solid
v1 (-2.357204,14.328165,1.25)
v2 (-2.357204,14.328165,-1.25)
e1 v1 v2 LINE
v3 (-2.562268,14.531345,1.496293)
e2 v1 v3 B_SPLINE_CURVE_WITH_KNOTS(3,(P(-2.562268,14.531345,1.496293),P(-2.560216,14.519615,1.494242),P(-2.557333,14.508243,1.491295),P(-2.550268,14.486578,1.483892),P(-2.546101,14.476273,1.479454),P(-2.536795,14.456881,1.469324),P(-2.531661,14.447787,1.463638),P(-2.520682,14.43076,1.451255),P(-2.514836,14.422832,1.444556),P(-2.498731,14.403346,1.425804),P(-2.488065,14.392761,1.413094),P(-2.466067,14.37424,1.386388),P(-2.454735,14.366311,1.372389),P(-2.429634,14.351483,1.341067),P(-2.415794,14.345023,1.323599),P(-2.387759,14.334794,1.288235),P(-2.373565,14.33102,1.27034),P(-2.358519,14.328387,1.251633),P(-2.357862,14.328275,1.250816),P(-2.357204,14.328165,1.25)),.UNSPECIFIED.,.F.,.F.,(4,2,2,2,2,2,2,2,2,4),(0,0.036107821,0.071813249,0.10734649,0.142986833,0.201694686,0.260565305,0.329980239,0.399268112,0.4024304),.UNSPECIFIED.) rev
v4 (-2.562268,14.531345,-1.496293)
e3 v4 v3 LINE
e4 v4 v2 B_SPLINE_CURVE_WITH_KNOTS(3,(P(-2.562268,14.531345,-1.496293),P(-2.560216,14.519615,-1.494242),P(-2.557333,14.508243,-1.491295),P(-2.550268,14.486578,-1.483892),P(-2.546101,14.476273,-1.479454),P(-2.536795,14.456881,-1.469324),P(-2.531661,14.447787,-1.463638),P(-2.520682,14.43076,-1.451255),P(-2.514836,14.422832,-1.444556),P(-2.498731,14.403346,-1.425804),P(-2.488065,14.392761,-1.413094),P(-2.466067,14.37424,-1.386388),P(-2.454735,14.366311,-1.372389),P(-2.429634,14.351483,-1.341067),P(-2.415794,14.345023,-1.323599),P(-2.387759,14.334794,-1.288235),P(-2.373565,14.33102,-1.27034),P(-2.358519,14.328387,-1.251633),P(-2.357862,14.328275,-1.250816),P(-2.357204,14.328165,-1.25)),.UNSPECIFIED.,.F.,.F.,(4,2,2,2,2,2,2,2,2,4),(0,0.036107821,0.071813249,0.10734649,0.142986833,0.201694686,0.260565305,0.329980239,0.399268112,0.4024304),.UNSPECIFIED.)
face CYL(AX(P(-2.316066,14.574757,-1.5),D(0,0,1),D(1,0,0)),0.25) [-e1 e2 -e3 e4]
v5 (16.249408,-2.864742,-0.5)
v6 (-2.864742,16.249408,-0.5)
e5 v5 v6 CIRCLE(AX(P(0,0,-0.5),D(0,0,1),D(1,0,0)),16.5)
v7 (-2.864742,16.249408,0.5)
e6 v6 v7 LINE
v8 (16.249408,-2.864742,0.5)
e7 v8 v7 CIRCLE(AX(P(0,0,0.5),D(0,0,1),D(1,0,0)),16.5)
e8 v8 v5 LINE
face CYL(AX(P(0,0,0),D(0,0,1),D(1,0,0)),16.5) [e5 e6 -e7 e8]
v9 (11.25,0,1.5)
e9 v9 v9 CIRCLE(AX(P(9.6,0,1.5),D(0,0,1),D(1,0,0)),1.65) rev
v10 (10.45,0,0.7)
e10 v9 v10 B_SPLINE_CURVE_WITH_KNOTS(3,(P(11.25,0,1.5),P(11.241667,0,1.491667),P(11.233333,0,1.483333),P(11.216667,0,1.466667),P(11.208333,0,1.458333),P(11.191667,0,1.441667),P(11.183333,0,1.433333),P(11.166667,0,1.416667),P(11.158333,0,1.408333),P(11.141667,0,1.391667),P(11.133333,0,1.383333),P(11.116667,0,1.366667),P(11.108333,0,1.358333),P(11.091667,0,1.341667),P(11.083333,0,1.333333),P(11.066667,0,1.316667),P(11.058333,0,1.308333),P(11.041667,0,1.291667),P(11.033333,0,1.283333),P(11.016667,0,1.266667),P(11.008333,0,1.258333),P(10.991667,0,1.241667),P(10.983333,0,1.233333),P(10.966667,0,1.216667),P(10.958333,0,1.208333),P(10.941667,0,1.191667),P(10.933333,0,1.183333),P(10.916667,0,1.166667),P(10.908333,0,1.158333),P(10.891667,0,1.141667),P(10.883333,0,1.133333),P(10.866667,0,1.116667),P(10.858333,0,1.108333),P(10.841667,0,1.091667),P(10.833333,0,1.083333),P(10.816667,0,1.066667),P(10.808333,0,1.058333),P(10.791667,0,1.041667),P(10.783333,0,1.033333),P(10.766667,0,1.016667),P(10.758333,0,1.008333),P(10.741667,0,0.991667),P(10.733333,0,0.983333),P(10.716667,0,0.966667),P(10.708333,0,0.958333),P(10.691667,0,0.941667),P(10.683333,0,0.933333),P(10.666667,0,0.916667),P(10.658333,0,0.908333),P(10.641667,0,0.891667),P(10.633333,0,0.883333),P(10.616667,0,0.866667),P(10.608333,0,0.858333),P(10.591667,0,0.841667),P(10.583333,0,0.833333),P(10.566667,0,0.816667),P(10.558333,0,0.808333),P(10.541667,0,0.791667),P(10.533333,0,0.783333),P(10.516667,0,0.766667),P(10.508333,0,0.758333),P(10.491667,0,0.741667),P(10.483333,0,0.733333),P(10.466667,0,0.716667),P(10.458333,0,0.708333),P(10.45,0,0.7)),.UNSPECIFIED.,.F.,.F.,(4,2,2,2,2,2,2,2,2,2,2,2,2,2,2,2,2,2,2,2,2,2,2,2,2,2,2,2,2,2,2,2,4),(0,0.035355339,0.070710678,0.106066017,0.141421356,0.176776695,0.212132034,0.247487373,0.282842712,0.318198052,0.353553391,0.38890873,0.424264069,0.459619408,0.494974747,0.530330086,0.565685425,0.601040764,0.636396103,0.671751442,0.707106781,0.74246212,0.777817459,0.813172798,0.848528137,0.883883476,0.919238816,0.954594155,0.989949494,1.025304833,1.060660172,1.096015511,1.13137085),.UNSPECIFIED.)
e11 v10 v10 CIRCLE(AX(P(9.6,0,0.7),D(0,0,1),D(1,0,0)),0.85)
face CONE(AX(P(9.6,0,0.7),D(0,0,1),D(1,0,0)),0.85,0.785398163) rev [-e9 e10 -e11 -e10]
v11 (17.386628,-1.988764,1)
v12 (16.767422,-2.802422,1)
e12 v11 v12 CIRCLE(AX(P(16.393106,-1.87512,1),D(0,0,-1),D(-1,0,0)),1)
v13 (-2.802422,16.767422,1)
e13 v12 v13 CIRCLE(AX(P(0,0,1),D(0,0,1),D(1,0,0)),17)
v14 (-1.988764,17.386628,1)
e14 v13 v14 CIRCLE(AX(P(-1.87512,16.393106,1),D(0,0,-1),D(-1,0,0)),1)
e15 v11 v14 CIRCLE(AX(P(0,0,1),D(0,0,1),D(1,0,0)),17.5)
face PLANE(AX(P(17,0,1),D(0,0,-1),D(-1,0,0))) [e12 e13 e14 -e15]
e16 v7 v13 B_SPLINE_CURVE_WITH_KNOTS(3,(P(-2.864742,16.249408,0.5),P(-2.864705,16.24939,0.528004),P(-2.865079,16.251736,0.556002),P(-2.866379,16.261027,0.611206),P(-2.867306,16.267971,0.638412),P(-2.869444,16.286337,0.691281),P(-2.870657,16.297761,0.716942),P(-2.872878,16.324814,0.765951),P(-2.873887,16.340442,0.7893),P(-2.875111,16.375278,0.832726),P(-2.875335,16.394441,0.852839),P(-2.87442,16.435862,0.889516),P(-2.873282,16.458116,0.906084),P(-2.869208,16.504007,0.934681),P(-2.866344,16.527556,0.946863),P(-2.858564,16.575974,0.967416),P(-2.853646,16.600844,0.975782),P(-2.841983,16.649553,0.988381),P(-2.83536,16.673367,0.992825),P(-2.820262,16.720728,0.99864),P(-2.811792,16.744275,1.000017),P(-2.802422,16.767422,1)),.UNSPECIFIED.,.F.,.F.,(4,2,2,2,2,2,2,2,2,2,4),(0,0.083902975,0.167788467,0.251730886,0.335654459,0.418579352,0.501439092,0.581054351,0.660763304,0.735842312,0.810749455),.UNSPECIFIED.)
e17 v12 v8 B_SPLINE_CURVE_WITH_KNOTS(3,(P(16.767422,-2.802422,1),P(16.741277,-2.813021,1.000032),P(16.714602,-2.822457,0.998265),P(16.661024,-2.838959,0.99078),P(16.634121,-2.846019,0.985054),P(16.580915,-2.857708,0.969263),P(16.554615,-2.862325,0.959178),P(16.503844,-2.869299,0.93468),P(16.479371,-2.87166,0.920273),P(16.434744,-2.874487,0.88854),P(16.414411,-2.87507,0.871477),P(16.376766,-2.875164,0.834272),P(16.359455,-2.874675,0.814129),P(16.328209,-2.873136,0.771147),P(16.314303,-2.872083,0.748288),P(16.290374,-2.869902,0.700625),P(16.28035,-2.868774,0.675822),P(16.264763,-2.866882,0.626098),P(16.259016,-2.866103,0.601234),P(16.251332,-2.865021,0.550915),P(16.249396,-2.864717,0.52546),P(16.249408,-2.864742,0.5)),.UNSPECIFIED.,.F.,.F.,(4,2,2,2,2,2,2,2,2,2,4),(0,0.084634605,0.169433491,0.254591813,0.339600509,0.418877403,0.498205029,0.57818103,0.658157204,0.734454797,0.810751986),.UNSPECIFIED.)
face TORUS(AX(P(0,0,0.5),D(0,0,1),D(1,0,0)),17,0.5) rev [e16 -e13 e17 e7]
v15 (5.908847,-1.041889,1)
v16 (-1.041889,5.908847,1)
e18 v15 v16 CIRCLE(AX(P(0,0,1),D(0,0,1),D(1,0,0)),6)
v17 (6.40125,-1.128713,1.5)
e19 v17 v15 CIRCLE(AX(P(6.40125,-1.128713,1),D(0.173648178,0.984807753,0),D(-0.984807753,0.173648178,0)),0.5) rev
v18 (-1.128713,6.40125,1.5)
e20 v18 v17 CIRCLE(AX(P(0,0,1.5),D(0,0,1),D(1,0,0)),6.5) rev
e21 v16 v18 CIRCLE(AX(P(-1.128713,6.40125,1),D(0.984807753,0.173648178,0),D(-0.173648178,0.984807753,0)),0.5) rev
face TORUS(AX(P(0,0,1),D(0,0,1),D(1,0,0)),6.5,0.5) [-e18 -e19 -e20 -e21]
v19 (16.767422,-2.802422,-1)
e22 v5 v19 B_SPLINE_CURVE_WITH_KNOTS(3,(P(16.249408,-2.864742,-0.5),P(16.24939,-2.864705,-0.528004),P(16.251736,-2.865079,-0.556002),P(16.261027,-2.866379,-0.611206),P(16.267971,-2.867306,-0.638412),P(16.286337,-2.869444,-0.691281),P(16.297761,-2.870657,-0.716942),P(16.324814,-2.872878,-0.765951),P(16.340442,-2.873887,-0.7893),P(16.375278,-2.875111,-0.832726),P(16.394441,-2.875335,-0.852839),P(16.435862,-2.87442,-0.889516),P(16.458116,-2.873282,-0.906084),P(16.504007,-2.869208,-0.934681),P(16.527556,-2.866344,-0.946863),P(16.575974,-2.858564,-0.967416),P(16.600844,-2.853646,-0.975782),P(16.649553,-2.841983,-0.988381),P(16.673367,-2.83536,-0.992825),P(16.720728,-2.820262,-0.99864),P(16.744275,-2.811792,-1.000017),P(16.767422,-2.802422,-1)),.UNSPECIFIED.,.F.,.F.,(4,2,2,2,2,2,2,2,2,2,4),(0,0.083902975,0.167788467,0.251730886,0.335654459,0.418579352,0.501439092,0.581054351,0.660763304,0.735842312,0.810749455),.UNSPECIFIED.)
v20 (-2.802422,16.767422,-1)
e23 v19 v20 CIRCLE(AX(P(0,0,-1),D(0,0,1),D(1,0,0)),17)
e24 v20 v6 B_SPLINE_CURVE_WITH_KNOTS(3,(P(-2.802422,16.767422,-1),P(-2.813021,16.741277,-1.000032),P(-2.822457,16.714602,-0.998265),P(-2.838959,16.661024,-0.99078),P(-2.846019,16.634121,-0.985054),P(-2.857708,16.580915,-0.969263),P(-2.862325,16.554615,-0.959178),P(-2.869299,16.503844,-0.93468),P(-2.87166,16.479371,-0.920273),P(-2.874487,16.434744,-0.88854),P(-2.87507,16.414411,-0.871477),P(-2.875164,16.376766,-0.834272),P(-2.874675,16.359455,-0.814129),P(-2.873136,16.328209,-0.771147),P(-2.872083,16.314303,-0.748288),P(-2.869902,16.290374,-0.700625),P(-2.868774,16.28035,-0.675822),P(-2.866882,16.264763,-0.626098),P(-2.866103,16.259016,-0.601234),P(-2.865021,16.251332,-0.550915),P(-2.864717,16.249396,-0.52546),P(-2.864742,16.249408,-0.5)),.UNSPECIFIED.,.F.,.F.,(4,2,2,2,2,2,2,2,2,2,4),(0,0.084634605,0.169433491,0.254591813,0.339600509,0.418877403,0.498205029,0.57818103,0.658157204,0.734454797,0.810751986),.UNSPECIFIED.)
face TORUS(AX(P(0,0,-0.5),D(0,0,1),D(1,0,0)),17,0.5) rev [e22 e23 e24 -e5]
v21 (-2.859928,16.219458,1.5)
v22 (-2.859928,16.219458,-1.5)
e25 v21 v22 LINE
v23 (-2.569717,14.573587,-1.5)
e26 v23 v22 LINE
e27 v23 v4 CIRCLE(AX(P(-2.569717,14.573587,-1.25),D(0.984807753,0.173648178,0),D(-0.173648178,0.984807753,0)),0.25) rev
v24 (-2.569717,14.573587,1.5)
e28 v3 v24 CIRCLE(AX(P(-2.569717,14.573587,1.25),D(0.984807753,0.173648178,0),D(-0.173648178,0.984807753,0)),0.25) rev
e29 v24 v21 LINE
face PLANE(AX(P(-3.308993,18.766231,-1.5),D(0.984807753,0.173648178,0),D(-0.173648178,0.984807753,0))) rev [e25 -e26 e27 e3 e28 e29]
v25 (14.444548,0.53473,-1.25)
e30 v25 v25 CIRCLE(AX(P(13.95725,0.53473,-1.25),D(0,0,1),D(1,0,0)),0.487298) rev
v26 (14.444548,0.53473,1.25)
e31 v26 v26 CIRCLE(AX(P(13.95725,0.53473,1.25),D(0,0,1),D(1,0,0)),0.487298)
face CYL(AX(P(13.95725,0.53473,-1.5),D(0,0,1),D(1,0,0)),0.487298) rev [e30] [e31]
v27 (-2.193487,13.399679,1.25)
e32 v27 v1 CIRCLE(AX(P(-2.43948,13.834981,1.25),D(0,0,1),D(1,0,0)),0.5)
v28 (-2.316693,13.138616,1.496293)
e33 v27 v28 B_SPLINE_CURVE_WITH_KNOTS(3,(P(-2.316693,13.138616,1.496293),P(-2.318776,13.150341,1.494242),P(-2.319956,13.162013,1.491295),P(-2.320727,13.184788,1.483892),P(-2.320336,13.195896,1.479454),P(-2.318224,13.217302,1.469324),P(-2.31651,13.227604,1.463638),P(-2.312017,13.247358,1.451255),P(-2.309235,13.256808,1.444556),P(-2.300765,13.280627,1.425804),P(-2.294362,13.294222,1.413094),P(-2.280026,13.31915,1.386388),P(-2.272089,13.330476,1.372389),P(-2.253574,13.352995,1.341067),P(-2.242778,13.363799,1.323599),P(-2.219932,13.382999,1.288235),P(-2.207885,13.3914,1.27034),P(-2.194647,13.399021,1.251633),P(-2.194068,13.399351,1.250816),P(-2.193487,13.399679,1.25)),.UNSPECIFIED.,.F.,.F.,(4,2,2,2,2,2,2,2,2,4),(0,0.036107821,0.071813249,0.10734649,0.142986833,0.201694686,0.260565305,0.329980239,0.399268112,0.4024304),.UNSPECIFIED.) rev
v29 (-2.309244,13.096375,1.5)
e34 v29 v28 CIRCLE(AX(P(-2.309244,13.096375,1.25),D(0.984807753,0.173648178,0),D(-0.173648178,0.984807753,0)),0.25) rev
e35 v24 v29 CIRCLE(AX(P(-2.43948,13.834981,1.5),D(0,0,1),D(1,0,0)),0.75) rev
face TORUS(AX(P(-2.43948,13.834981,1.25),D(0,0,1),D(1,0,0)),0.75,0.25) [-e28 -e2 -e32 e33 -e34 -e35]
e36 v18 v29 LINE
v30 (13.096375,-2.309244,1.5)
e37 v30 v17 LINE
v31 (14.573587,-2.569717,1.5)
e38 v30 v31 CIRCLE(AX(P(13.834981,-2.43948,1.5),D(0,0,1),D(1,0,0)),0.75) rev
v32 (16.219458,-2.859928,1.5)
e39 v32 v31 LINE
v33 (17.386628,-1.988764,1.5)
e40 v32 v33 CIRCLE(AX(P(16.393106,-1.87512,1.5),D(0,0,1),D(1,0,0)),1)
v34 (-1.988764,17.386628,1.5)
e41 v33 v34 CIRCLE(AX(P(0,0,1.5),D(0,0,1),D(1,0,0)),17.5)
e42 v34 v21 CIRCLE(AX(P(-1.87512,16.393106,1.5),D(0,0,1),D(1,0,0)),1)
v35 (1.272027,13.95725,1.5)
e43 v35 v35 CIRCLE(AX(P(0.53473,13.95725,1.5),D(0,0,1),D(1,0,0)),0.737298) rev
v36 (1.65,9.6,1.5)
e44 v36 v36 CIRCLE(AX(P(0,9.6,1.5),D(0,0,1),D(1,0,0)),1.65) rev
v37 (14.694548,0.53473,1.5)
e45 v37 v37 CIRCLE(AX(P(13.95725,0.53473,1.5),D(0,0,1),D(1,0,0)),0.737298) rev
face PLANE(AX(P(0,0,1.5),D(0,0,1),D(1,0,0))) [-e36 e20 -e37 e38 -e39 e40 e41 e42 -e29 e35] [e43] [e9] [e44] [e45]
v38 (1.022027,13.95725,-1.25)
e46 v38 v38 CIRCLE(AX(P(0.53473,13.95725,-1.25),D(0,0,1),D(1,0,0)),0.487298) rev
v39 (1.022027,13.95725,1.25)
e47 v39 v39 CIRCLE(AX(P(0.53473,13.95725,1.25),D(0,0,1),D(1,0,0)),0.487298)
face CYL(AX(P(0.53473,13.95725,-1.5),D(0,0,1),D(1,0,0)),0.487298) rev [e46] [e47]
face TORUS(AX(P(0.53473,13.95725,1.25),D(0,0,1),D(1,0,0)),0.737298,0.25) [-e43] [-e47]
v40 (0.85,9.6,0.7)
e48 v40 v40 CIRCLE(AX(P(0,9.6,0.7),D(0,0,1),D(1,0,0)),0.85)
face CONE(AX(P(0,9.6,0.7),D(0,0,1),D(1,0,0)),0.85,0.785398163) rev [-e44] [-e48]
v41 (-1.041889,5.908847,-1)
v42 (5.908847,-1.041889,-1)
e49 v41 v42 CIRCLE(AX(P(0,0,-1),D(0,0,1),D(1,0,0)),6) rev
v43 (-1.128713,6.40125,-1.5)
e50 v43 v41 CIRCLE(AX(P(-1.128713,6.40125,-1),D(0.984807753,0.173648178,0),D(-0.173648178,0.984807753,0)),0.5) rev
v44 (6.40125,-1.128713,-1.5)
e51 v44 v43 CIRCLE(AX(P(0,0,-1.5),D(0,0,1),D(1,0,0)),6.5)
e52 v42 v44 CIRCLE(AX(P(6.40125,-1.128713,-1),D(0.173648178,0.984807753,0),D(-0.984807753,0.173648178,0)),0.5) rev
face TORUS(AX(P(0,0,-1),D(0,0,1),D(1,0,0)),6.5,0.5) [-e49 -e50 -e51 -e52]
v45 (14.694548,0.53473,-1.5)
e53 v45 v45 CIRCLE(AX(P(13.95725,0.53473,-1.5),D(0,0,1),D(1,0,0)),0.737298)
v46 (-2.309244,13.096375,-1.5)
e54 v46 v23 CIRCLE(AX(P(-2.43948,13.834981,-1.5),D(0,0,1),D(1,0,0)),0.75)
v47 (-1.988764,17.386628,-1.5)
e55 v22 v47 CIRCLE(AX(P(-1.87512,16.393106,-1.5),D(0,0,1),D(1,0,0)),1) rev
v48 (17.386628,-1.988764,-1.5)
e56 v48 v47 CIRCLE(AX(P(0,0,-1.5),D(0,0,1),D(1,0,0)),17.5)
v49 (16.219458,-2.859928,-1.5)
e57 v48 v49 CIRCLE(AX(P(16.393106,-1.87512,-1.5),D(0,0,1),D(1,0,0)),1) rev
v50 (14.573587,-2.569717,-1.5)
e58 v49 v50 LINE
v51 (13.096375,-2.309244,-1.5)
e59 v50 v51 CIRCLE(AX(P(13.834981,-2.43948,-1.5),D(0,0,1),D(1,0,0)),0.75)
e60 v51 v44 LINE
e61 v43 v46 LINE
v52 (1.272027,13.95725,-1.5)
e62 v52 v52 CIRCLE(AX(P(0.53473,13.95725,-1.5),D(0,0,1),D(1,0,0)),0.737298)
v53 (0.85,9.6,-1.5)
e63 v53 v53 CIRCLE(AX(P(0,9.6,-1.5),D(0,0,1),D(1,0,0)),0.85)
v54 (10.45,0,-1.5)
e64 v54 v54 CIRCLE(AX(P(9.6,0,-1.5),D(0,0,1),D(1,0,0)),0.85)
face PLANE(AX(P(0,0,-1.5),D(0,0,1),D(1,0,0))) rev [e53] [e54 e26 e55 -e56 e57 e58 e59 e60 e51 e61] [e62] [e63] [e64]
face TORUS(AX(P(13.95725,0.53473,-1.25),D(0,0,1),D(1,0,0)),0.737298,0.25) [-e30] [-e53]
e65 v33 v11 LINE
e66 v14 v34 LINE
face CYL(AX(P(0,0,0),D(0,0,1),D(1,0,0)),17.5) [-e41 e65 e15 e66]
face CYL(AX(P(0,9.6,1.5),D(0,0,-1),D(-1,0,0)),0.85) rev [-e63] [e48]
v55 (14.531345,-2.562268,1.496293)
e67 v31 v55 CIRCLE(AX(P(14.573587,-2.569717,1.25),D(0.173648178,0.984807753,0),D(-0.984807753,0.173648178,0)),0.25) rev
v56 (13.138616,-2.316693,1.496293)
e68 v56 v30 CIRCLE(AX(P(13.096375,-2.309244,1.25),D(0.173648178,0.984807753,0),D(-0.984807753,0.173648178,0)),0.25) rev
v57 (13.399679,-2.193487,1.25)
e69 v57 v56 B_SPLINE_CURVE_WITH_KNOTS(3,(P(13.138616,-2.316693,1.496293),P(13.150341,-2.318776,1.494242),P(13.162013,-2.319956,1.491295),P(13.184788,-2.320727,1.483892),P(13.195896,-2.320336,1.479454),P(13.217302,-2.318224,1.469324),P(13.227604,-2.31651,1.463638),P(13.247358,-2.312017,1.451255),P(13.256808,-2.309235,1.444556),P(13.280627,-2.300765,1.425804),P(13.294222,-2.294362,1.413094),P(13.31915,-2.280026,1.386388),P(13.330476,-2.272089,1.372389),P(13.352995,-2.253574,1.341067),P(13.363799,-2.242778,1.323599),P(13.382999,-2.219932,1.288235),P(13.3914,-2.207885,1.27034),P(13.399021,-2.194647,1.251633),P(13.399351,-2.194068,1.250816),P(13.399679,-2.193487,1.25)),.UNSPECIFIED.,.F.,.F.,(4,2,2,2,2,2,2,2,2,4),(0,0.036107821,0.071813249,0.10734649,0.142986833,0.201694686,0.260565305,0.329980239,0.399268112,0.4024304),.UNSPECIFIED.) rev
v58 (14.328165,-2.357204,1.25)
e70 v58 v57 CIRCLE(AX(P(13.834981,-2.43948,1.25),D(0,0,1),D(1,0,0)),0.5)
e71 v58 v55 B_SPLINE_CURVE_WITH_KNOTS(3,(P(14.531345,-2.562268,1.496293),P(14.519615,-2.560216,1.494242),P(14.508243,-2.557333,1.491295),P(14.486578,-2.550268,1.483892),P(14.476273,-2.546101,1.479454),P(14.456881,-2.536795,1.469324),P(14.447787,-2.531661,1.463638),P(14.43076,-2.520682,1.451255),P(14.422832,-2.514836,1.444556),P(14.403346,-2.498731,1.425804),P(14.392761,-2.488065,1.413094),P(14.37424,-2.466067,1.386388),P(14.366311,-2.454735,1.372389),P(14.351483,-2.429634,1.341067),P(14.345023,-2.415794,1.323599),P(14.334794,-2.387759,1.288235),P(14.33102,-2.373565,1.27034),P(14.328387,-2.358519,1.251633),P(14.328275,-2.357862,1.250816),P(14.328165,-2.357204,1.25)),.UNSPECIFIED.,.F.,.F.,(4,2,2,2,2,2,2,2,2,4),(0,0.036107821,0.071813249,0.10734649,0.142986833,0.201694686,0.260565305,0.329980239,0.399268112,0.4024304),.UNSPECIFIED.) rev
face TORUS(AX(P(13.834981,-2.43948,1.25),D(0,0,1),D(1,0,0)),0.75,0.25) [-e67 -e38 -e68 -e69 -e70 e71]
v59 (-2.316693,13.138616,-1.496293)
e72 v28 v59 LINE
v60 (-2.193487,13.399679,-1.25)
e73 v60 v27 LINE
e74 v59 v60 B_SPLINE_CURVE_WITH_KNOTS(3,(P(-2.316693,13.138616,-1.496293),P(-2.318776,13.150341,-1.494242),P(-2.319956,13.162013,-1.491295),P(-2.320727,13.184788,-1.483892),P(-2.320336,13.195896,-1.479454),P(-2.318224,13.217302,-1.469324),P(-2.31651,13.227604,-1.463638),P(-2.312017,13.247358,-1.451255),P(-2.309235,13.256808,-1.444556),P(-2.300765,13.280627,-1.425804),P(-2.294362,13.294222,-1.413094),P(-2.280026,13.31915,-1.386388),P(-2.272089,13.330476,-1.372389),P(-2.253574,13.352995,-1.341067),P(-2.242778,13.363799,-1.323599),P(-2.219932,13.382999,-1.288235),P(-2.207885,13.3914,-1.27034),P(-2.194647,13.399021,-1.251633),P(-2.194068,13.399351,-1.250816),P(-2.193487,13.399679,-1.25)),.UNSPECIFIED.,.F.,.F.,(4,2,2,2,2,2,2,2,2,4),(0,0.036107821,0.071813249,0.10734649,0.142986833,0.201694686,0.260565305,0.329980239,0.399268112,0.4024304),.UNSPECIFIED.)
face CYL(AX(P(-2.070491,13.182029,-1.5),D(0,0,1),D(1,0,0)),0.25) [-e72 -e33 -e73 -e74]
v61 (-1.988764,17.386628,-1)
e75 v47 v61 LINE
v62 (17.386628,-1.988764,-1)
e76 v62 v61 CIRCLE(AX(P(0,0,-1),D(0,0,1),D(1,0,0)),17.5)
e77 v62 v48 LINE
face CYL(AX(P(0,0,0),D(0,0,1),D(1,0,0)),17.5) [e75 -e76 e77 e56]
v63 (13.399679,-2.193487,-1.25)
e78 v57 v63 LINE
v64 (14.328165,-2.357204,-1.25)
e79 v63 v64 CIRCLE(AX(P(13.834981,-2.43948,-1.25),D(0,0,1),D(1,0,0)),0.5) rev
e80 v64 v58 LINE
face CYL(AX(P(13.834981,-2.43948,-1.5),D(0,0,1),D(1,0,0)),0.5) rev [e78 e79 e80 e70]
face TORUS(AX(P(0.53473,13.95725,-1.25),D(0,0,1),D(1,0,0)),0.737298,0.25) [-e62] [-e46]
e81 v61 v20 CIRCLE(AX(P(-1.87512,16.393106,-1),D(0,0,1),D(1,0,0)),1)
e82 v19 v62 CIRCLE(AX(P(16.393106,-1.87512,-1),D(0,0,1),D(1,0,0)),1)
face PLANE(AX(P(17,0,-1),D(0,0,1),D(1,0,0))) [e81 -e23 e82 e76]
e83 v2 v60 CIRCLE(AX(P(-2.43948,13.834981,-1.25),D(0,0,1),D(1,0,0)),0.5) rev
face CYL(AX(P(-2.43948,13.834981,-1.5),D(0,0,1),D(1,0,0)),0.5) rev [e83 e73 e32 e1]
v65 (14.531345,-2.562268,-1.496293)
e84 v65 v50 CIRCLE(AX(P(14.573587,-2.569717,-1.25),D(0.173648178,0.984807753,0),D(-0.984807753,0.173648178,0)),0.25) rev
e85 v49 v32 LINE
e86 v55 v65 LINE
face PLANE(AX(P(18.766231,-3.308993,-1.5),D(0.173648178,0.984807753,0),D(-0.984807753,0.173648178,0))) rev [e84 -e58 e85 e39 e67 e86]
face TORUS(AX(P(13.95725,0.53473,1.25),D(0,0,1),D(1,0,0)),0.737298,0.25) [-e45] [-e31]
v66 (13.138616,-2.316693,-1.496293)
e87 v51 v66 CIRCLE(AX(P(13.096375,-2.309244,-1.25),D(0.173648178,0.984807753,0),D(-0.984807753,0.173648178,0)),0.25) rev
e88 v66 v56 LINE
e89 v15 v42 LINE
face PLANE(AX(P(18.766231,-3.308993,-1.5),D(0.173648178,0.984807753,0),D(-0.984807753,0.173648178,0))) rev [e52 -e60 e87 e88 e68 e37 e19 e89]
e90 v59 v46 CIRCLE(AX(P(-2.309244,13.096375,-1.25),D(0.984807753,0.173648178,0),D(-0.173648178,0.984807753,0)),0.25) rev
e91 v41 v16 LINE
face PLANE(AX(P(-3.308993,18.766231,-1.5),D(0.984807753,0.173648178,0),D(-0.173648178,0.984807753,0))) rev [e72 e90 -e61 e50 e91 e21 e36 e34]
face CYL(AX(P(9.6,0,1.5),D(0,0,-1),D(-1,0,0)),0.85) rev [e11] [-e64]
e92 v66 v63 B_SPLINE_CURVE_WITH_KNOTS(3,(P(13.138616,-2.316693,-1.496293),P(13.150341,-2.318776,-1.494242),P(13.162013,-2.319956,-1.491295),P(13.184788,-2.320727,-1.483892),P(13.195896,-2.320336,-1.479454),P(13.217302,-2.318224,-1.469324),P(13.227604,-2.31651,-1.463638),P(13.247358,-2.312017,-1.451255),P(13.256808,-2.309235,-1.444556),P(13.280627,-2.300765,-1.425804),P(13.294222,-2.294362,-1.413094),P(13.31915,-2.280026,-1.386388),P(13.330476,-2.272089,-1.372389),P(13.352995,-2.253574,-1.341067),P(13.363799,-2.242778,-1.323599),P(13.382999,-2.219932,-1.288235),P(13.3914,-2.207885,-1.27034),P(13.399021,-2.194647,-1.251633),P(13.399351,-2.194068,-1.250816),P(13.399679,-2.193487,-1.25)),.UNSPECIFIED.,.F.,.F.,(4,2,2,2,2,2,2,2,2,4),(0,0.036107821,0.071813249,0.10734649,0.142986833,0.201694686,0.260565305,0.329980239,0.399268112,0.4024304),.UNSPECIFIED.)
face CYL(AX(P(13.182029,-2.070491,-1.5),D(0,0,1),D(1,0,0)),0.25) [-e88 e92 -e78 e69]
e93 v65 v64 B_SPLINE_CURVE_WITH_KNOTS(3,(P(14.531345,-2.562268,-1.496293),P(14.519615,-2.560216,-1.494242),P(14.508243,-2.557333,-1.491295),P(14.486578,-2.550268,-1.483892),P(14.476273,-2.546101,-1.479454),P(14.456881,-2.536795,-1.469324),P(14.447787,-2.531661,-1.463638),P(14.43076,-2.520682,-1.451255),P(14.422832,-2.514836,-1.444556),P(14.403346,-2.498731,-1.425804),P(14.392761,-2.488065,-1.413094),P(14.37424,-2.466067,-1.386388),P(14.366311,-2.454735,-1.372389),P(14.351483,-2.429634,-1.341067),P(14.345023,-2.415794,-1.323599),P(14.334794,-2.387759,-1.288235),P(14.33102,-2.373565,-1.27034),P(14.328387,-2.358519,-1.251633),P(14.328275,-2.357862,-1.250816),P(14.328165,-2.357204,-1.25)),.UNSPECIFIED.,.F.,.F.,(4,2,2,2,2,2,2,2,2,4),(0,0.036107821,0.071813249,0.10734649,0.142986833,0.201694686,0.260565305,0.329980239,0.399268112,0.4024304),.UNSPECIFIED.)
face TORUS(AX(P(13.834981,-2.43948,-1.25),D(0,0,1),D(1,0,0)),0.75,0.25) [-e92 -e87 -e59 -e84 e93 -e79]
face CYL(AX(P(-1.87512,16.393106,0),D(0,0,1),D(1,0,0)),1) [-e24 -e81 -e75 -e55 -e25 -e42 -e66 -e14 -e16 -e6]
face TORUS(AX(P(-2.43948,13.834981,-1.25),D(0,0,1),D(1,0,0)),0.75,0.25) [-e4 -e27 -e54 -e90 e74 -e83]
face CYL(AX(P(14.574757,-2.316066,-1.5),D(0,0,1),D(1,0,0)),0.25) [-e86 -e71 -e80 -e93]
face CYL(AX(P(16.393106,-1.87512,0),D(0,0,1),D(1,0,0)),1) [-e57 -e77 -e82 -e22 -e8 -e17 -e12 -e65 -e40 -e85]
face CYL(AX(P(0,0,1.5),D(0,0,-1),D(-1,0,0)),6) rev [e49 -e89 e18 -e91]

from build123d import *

# Parameters (mm, degrees)
SKETCH1_R               = 17
SKETCH1_R_2             = 0.85
SKETCH1_R_3             = 6
BOSS_EXTRUDE1_DEPTH     = 1.5
SKETCH7_W               = 0.5
SKETCH7_H               = 0.5
CUT_EXTRUDE1_DEPTH      = 25.794152536
CUT_EXTRUDE1_DEPTH_BACK = 25.794152536
CUT_EXTRUDE2_DEPTH      = 25.929901725
CUT_EXTRUDE2_DEPTH_BACK = 25.929901725
SKETCH5_R               = 0.5
SKETCH5_R_2             = 0.48729794
FILLET1_R               = 0.5
CHAMFER1_SIZE           = 0.8
FILLET2_R               = 1
FILLET3_R               = 0.25


with BuildPart() as part:
    # Sketch1 → Boss-Extrude1 (new, symmetric)
    with BuildSketch(Plane.XY):
        Circle(SKETCH1_R)
        with Locations((9.6, 0)):
            Circle(SKETCH1_R_2, mode=Mode.SUBTRACT)
        Circle(SKETCH1_R_3, mode=Mode.SUBTRACT)
        with Locations((0, -9.6)):
            Circle(SKETCH1_R_2, mode=Mode.SUBTRACT)
        with Locations((-9.6, 0)):
            Circle(SKETCH1_R_2, mode=Mode.SUBTRACT)
        with Locations((0, 9.6)):
            Circle(SKETCH1_R_2, mode=Mode.SUBTRACT)
    extrude(amount=BOSS_EXTRUDE1_DEPTH, both=True)

    # Sketch2 → Cut-Revolve1 (revolve, cut)
    with BuildSketch(Plane(origin=(0, 0, 0), x_dir=(1, 0, 0), z_dir=(0, 1, 0)), mode=Mode.PRIVATE) as cut_revolve1_sk:
        with BuildLine():
            Line((-16.5, -0.5), (-16.5, 0.5))
            ThreePointArc((-16.5, 0.5), (-16.646446609, 0.853553391), (-17, 1))
            Line((-17, 1), (-17, -1))
            ThreePointArc((-17, -1), (-16.646446609, -0.853553391), (-16.5, -0.5))
        make_face()
    revolve(cut_revolve1_sk.sketch.rotate(Axis((0, 0, 0), (0, 0, -1)), 180), axis=Axis((0, 0, 0), (0, 0, -1)), mode=Mode.SUBTRACT)

    # Sketch7 → Revolve1 (revolve)
    with BuildSketch(Plane(origin=(0, 0, 0), x_dir=(1, 0, 0), z_dir=(0, 1, 0))):
        with Locations((17.25, 1.25)):
            Rectangle(SKETCH7_W, SKETCH7_H)
        with Locations((17.25, -1.25)):
            Rectangle(SKETCH7_W, SKETCH7_H)
    revolve(axis=Axis((0, 0, 0), (0, 0, -1)))

    # Sketch4 → Cut-Extrude1 (cut, two sides: drawn at the far end of the back side and taken through both)
    with BuildSketch(Plane.XY.offset(-CUT_EXTRUDE1_DEPTH_BACK)):
        Polygon((-3.30899291, 18.766231333), (0, 0), (18.766231333, -3.30899291), (18.766231333, -21.784688157), (-24.932091475, -21.784688157), (-24.932091475, 18.766231333), align=None)
    extrude(amount=CUT_EXTRUDE1_DEPTH + CUT_EXTRUDE1_DEPTH_BACK, mode=Mode.SUBTRACT)

    # Sketch5 → Cut-Extrude2 (cut, two sides: drawn at the far end of the back side and taken through both)
    with BuildSketch(Plane.XY.offset(1.5).offset(-CUT_EXTRUDE2_DEPTH_BACK)):
        with Locations((-2.439480379, 13.834980723)):
            Circle(SKETCH5_R)
        with Locations((0.534729508, 13.957250241)):
            Circle(SKETCH5_R_2)
        with Locations((13.957250241, 0.534729508)):
            Circle(SKETCH5_R_2)
        with Locations((13.834980723, -2.439480379)):
            Circle(SKETCH5_R)
    extrude(amount=CUT_EXTRUDE2_DEPTH + CUT_EXTRUDE2_DEPTH_BACK, mode=Mode.SUBTRACT)

    # Fillet1
    fillet1_edges = [part.edges().sort_by_distance(p)[0] for p in [
        (4.242640687, 4.242640687, 1.5),
        (4.242640687, 4.242640687, -1.5),
    ]]
    fillet(fillet1_edges, radius=FILLET1_R)

    # Chamfer1
    chamfer1_edges = [part.edges().sort_by_distance(p)[0] for p in [
        (8.75, 0, 1.5),
        (-0.85, 9.6, 1.5),
    ]]
    chamfer(chamfer1_edges, length=CHAMFER1_SIZE)

    # Fillet2
    # the kernel refuses this fillet: 1 mm, written as the material it takes off along each edge
    with BuildSketch(Plane(origin=(17.234135678, -3.038843109, 4.15273452), x_dir=(0.1437119745897139, 0.9896195573853244, 0), z_dir=(0, 0, -1))) as fillet2_piece_1:
        with BuildLine():
            CenterArc((1.030776842, -0.999540335), FILLET2_R, 88.262699603, 93.474600793)
            Line((0.031236507, -1.029857301), (0, 0))
            ThreePointArc((0, 0), (0.530546904, 0.008044135), (1.061093808, 0))
        make_face()
    extrude(amount=5.805469041, mode=Mode.SUBTRACT)
    with BuildSketch(Plane(origin=(-3.038843109, 17.234135678, -4.15273452), x_dir=(0.17364817766692695, -0.9848077530122086, 0), z_dir=(0, 0, 1))) as fillet2_piece_2:
        with BuildLine():
            CenterArc((1.030330908, 1), FILLET2_R, 176.525399207, 93.474600793)
            ThreePointArc((0.032169145, 1.060606061), (0.008044135, 0.530546904), (0, 0))
            Line((0, 0), (1.030330908, 0))
        make_face()
    extrude(amount=5.805469041, mode=Mode.SUBTRACT)

    # Fillet3
    fillet3_edges = [part.edges().sort_by_distance(p)[0] for p in [
        (13.921804812, -1.947076503, -1.5),
        (13.921804812, -1.947076503, 1.5),
        (14.3273846, -2.526304468, 0),
        (13.342576847, -2.35265629, 0),
        (-2.35265629, 13.342576847, 0),
        (-2.526304468, 14.3273846, 0),
        (-1.947076503, 13.921804812, -1.5),
        (-1.947076503, 13.921804812, 1.5),
        (0.047431568, 13.957250241, 1.5),
        (0.047431568, 13.957250241, -1.5),
        (13.469952302, 0.534729508, 1.5),
        (13.469952302, 0.534729508, -1.5),
    ]]
    fillet(fillet3_edges, radius=FILLET3_R)


solid = part.part
